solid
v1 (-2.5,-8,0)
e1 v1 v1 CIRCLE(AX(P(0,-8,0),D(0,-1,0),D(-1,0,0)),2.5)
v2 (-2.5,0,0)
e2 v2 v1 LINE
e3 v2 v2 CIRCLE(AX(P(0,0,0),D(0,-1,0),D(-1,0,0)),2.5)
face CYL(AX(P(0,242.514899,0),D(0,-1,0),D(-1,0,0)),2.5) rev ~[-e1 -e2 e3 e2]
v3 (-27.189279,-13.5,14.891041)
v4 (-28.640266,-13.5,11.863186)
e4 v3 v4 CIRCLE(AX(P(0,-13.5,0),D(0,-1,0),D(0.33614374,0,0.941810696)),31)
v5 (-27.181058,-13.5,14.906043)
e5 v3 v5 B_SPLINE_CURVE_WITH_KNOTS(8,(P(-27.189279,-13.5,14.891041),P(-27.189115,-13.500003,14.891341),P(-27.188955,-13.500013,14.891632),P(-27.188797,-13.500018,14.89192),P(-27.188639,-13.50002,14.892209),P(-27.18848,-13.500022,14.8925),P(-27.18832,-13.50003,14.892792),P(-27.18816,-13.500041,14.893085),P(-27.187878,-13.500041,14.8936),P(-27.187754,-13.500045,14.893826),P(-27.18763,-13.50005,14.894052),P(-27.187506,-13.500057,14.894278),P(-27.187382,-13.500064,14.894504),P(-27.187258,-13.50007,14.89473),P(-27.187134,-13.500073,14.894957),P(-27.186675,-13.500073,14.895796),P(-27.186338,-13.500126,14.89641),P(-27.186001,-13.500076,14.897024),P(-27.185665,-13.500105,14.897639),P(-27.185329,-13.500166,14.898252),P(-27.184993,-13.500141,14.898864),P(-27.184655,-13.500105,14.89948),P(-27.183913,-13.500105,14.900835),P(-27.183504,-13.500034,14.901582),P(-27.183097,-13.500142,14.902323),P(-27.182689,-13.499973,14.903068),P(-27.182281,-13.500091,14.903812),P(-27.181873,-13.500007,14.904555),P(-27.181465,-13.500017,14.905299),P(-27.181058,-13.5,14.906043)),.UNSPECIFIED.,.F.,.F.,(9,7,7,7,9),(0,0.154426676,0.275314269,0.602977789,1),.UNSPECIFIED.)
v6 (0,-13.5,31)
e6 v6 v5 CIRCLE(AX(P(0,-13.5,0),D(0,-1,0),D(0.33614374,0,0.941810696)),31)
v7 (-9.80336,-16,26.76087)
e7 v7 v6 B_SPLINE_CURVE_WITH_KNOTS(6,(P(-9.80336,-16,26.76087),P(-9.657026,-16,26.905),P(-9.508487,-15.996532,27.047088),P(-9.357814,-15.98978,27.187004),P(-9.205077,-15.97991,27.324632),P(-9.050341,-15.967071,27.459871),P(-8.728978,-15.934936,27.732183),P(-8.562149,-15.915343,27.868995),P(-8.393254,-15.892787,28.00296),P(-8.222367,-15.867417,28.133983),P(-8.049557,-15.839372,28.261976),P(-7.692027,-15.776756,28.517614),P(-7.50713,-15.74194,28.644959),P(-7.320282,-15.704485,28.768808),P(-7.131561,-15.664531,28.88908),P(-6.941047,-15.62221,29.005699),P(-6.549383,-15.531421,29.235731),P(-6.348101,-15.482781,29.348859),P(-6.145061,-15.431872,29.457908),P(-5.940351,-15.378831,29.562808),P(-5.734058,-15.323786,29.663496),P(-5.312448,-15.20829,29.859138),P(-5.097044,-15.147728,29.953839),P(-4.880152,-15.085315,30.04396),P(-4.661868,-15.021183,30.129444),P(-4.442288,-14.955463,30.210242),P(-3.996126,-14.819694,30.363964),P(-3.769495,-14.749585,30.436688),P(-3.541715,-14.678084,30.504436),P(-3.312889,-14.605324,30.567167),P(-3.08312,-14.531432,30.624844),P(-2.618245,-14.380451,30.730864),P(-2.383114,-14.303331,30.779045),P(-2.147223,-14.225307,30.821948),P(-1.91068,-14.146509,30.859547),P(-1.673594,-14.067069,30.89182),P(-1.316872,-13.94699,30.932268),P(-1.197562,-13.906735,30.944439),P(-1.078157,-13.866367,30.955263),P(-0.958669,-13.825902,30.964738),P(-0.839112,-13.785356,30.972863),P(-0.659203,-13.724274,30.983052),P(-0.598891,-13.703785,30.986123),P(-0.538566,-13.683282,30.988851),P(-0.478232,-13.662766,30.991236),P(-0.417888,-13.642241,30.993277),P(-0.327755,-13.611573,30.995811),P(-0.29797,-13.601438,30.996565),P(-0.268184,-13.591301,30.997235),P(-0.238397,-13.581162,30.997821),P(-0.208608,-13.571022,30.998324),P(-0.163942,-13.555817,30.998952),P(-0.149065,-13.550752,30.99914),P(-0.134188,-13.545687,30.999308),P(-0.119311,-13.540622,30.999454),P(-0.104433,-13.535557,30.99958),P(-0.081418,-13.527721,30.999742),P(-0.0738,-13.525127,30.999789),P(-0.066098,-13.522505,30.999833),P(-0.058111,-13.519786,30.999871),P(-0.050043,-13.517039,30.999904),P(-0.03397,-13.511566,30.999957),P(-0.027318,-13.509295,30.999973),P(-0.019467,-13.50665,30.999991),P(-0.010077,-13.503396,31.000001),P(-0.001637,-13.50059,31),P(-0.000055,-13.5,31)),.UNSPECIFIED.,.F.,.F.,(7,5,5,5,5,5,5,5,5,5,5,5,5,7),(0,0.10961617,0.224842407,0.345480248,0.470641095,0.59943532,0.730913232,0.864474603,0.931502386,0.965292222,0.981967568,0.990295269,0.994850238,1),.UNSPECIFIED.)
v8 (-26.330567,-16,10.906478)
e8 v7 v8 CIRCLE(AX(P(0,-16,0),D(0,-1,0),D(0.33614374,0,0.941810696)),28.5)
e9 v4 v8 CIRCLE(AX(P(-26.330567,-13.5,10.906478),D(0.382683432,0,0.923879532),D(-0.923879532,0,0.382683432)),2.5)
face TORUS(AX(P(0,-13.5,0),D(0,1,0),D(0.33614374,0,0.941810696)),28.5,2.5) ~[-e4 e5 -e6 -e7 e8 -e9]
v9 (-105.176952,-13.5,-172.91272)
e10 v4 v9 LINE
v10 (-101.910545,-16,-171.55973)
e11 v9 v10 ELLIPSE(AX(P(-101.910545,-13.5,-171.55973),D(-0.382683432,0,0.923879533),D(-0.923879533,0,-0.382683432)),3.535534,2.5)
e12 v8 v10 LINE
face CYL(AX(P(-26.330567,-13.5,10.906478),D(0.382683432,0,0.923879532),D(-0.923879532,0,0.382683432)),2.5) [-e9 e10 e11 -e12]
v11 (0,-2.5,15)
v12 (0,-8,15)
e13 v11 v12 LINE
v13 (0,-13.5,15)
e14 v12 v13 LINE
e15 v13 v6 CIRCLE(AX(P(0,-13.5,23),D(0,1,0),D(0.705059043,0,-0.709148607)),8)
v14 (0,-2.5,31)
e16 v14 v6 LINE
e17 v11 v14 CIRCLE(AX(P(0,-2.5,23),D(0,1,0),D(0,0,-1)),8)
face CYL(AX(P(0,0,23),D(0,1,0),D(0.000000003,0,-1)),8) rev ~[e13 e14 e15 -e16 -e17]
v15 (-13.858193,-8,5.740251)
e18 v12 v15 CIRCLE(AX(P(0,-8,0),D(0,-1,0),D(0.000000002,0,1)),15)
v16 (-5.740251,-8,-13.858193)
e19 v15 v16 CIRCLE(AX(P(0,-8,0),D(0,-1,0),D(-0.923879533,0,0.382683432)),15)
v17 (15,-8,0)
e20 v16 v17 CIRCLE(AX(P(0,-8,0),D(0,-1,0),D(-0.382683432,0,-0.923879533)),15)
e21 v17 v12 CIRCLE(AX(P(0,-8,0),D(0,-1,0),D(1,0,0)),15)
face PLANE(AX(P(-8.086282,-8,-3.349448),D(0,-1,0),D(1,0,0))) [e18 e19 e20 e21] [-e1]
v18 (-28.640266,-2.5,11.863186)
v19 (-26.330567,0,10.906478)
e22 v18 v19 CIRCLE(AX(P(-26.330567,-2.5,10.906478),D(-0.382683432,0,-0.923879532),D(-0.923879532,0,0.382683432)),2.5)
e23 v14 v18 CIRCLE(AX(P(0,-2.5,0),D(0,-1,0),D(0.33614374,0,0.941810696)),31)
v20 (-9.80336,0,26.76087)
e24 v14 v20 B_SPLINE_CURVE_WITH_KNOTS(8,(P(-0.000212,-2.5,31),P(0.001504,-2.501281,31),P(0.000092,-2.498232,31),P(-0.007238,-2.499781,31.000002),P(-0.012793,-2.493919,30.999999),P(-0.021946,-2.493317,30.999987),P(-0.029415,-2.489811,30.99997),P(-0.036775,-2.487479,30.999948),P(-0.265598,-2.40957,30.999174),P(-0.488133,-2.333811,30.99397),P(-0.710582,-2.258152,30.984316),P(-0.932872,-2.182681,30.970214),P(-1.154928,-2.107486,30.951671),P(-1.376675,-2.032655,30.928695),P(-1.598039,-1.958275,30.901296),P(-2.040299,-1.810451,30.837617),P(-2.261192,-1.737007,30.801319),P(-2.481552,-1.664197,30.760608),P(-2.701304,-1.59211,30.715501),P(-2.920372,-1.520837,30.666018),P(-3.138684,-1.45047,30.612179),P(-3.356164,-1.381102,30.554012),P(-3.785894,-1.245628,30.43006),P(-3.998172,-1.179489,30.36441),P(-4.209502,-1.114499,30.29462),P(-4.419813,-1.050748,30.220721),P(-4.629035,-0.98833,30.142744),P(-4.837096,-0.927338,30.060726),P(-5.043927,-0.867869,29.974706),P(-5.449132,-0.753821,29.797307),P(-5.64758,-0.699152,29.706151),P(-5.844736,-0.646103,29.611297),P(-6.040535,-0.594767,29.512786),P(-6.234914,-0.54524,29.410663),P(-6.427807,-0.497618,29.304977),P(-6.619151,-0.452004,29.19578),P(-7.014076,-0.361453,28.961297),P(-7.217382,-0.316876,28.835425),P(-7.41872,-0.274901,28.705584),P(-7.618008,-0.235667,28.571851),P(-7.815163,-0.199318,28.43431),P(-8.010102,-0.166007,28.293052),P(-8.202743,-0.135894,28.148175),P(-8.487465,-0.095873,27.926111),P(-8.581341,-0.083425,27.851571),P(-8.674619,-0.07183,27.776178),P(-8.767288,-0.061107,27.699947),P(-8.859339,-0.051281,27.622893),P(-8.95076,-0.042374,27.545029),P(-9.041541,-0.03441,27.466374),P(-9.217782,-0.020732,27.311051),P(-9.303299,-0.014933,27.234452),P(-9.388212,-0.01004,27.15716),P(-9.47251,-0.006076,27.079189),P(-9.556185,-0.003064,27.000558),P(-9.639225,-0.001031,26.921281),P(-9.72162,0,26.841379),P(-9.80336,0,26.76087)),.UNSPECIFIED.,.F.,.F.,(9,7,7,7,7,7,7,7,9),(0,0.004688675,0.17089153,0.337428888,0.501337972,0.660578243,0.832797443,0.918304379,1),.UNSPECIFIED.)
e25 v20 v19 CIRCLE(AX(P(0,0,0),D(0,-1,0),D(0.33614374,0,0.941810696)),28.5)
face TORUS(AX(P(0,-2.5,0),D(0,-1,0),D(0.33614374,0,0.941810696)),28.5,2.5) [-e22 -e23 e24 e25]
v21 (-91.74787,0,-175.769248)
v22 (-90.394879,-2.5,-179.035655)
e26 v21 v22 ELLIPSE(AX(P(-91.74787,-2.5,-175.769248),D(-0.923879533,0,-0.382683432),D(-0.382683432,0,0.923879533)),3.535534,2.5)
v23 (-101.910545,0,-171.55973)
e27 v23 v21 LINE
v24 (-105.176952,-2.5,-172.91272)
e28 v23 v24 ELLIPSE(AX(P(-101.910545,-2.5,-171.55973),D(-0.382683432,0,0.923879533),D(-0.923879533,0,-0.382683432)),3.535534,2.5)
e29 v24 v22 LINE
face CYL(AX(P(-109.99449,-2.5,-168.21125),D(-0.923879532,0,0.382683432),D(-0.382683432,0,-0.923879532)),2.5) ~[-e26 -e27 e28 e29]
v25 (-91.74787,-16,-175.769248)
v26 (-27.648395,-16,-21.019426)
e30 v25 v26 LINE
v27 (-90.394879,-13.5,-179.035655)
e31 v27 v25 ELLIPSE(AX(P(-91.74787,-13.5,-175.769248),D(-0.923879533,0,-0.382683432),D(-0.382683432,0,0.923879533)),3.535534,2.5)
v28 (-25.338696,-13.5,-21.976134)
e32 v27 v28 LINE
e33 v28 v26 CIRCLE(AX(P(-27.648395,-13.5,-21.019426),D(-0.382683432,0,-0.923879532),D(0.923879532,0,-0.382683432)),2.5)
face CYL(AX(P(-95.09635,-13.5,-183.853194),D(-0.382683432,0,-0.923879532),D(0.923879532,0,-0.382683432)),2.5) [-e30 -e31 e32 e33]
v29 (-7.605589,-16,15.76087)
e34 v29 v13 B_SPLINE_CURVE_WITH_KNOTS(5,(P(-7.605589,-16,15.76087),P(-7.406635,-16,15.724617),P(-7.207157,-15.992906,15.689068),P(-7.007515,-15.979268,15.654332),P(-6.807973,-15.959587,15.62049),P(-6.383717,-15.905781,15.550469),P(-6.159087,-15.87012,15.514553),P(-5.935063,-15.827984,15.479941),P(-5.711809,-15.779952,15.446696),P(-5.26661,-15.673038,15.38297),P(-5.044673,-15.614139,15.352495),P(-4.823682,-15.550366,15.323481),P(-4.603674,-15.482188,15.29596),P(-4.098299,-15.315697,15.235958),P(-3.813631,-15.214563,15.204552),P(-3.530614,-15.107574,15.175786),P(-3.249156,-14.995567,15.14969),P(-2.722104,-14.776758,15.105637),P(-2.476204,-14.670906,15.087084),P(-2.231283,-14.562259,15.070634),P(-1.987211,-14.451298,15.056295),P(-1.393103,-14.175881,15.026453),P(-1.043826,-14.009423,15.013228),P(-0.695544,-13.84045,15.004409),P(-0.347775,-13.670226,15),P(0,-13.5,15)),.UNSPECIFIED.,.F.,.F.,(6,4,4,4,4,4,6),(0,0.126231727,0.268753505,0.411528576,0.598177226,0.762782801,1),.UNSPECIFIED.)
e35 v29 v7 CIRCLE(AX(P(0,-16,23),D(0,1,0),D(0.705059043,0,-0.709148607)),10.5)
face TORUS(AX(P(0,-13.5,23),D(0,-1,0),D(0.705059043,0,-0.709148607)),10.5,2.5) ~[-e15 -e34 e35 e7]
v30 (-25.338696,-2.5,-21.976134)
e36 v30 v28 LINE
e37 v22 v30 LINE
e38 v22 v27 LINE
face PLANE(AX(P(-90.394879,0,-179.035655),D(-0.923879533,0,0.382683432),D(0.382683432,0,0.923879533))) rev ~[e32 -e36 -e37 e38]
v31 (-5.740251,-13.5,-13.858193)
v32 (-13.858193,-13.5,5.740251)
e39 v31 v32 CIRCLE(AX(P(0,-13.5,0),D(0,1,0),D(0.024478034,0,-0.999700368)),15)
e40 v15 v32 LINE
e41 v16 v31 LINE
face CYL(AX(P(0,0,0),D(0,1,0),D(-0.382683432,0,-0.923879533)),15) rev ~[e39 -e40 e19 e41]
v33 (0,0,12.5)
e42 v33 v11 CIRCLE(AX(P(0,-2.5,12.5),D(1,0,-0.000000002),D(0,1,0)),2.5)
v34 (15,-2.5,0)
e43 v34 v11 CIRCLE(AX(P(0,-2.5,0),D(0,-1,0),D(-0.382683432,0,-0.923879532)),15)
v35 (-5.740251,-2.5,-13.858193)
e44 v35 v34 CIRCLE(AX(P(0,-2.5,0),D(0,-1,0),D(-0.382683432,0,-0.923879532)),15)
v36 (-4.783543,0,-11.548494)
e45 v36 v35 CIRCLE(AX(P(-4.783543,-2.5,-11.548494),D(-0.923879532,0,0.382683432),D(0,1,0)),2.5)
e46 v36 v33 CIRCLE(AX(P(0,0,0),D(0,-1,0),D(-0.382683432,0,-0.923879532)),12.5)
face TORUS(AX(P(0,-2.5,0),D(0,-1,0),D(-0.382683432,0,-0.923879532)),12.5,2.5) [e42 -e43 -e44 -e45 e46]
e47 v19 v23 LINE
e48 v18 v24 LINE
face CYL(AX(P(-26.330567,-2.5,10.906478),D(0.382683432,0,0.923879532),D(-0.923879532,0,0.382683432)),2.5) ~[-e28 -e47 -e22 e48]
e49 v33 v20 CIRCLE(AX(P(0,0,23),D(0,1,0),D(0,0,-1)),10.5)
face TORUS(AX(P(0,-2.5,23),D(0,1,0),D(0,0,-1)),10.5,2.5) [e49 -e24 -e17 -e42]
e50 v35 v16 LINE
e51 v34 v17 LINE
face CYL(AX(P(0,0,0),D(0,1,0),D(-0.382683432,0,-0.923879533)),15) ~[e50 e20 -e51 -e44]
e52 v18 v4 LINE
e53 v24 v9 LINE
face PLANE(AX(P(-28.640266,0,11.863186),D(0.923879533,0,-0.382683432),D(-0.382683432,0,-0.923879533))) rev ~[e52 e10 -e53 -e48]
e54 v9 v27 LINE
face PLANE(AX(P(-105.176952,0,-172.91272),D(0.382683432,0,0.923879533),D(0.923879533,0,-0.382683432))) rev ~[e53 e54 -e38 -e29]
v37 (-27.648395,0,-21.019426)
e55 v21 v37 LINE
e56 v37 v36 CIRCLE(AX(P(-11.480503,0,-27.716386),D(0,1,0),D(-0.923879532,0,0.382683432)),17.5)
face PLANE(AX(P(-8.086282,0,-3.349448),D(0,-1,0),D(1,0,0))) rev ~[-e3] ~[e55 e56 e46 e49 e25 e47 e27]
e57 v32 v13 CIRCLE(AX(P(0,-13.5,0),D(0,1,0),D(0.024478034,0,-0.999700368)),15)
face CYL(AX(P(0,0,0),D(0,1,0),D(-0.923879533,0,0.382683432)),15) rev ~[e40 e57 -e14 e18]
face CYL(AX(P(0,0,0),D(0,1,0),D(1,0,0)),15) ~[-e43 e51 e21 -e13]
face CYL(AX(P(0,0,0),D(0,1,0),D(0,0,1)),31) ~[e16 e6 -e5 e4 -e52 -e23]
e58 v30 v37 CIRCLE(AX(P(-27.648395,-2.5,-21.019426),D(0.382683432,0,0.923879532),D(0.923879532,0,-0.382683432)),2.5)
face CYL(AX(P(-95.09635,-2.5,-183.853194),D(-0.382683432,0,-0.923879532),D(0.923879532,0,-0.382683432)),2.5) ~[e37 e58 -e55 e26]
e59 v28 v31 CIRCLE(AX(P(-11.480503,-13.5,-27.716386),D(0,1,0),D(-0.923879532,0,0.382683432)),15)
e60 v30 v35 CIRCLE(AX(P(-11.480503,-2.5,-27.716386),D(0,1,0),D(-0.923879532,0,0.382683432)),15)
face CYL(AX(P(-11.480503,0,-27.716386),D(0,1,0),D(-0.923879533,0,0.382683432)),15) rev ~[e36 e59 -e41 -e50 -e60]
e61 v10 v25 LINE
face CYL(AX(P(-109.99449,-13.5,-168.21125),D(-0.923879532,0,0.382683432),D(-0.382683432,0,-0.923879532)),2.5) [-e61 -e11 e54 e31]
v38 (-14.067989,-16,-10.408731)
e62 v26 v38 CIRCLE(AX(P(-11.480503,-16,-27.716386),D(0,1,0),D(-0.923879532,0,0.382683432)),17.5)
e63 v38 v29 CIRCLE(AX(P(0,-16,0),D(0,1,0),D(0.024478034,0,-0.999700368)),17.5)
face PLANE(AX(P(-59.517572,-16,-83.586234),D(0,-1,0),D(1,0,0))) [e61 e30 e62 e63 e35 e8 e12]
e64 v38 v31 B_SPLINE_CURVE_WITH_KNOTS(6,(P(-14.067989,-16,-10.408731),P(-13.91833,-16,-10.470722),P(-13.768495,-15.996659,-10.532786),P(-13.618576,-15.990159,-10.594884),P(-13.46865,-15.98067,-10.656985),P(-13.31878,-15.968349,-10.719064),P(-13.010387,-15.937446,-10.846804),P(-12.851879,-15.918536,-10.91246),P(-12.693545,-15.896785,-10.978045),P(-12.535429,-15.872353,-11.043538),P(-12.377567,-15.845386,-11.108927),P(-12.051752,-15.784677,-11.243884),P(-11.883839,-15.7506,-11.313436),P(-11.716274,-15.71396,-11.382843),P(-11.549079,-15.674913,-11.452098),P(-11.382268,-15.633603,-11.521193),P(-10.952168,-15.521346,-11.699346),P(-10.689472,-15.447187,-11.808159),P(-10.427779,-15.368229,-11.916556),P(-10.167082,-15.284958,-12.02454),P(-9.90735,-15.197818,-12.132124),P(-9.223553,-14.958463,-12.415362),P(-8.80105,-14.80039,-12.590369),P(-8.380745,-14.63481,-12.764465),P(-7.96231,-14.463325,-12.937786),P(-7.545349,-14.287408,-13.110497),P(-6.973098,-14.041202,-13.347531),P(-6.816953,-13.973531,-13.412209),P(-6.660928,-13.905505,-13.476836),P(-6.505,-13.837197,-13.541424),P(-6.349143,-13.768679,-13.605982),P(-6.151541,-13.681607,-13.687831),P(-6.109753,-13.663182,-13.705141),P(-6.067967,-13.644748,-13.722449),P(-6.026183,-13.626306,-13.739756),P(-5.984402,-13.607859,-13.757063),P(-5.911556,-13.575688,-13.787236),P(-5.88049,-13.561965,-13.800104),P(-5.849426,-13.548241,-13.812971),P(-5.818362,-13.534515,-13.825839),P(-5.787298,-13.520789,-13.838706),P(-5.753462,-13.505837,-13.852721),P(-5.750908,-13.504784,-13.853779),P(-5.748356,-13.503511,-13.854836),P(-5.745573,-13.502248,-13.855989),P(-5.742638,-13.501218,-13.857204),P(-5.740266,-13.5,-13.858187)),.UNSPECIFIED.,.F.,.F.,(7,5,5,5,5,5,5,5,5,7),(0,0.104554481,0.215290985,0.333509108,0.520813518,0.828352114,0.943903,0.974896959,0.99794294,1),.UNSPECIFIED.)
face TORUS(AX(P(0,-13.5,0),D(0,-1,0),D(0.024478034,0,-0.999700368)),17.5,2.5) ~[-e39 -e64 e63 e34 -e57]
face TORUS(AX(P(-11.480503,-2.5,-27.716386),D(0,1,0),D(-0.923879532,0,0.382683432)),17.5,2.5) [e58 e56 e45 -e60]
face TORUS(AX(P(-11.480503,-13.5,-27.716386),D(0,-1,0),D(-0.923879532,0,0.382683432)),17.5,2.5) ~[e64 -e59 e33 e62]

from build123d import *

# Parameters (mm, degrees)
F1_DEPTH     = 16
F2_DEPTH     = 8
F3_T1_DEPTH  = 28.5
F3_T3_DEPTH  = 176.25
F3_T5_DEPTH  = 206.25
F3_T8_ANGLE  = 113.8828315396
F3_T10_ANGLE = 205.3052563157
F3_T12_ANGLE = 301.0526480562
F3_T14_ANGLE = 87.1421031631
F3_T16_ANGLE = 90
F3_T18_ANGLE = 202.4999999088
F3_T20_ANGLE = 256.2183340246
F3_T22_ANGLE = 87.1421031631
F4_D         = 5


# Not quite as in the source:
# - a fillet or chamfer that OpenCascade refuses, or shapes differently, is made with other operations: its cross-section is extruded or revolved along the edge and cut away or added


with BuildPart() as f1:
    # F0 (on Front) → F1 (new body)
    with BuildSketch(Plane.XZ):
        Polygon((-25.3386959586, -21.9761344899), (-13.8581929877, 5.7402514855), (-28.6402655078, 11.8631864033), (-105.1769519809, -172.9127200989), (-90.3948794607, -179.0356550168), align=None)
        with BuildLine():
            Line((-28.6402655078, 11.8631864033), (-13.8581929877, 5.7402514855))
            ThreePointArc((-13.8581929877, 5.7402514855), (-8.3335534854, 12.4720441912), (2.39e-08, 15))
            ThreePointArc((2.39e-08, 15), (-8, 22.9999999881), (0, 31))
            ThreePointArc((0, 31), (-17.2226772236, 25.7755579814), (-28.6402655078, 11.8631864033))
        make_face()
        with BuildLine():
            ThreePointArc((-5.7402514855, -13.8581929877), (-13.8581929877, -5.7402514855), (-13.8581929877, 5.7402514855))
            Line((-13.8581929877, 5.7402514855), (-25.3386959586, -21.9761344899))
            ThreePointArc((-25.3386959586, -21.9761344899), (-17.2207544564, -13.8581929877), (-5.7402514855, -13.8581929877))
        make_face()
    extrude(amount=F1_DEPTH)

    # F0 (on Front) → F2 (join)
    with BuildSketch(Plane.XZ):
        with BuildLine():
            Line((0, 0), (-13.8581929877, 5.7402514855))
            ThreePointArc((-13.8581929877, 5.7402514855), (-13.8581929877, -5.7402514855), (-5.7402514855, -13.8581929877))
            Line((-5.7402514855, -13.8581929877), (0, 0))
        make_face()
        with BuildLine():
            ThreePointArc((2.39e-08, 15), (-8.3335534854, 12.4720441912), (-13.8581929877, 5.7402514855))
            Line((-13.8581929877, 5.7402514855), (0, 0))
            Line((0, 0), (-5.7402514855, -13.8581929877))
            ThreePointArc((-5.7402514855, -13.8581929877), (8.3335534953, -12.4720441845), (15, 0))
            ThreePointArc((15, 0), (10.6066017262, 10.6066017094), (2.39e-08, 15))
        make_face()
    extrude(amount=F2_DEPTH)

    # F3: fillet of radius 2.5 on 14 edges, made by hand

    # F3_s2 → F3_t1 (cut)
    with BuildSketch(Plane(origin=(-34.414512586, 0, 14.2549578556), x_dir=(0, 1, 0), z_dir=(0.9238795325, 0, -0.3826834324))):
        with BuildLine():
            ThreePointArc((-13.5, -200), (-15.267766953, -199.267766953), (-16, -197.5))
            Line((-16, -197.5), (-16, -200))
            Line((-16, -200), (-13.5, -200))
        make_face()
        with BuildLine():
            ThreePointArc((-2.5, -200), (-0.732233047, -199.267766953), (0, -197.5))
            Line((0, -197.5), (0, -200))
            Line((0, -200), (-2.5, -200))
        make_face()
    extrude(amount=F3_T1_DEPTH, mode=Mode.SUBTRACT)

    # F3_s4 → F3_t3 (cut)
    with BuildSketch(Plane(origin=(-78.9284579253, 0, -190.5501535805), x_dir=(0, 1, 0), z_dir=(0.3826834324, 0, 0.9238795325))):
        with BuildLine():
            ThreePointArc((-13.5, 15), (-15.267766953, 15.732233047), (-16, 17.5))
            Line((-16, 17.5), (-16, 15))
            Line((-16, 15), (-13.5, 15))
        make_face()
        with BuildLine():
            ThreePointArc((-2.5, 15), (-0.732233047, 15.732233047), (0, 17.5))
            Line((0, 17.5), (0, 15))
            Line((0, 15), (-2.5, 15))
        make_face()
    extrude(amount=F3_T3_DEPTH, mode=Mode.SUBTRACT)

    # F3_s6 → F3_t5 (cut)
    with BuildSketch(Plane(origin=(0, 0, 0), x_dir=(0, 1, 0), z_dir=(-0.3826834324, 0, -0.9238795325))):
        with BuildLine():
            ThreePointArc((-13.5, -31), (-15.267766953, -30.267766953), (-16, -28.5))
            Line((-16, -28.5), (-16, -31))
            Line((-16, -31), (-13.5, -31))
        make_face()
        with BuildLine():
            ThreePointArc((-2.5, -31), (-0.732233047, -30.267766953), (0, -28.5))
            Line((0, -28.5), (0, -31))
            Line((0, -31), (-2.5, -31))
        make_face()
    extrude(amount=F3_T5_DEPTH, mode=Mode.SUBTRACT)

    # F3_s7 → F3_t8 (revolve, cut)
    with BuildSketch(Plane(origin=(-11.480502971, 0, -27.7163859753), x_dir=(0, 1, 0), z_dir=(-0.3826834324, 0, -0.9238795325))):
        with BuildLine():
            ThreePointArc((-16, -17.5), (-15.267766953, -15.732233047), (-13.5, -15))
            Line((-13.5, -15), (-16, -15))
            Line((-16, -15), (-16, -17.5))
        make_face()
    revolve(axis=Axis((-11.480502971, -16, -27.7163859753), (0, 1, 0)), revolution_arc=F3_T8_ANGLE, mode=Mode.SUBTRACT)

    # F3_s9 → F3_t10 (revolve, cut)
    with BuildSketch(Plane(origin=(0, 0, 0), x_dir=(0, 1, 0), z_dir=(0.999700368, 0, 0.0244780336))):
        with BuildLine():
            ThreePointArc((-16, -17.5), (-15.267766953, -15.732233047), (-13.5, -15))
            Line((-13.5, -15), (-16, -15))
            Line((-16, -15), (-16, -17.5))
        make_face()
    revolve(axis=Axis((0, -16, 0), (0, 1, 0)), revolution_arc=F3_T10_ANGLE, mode=Mode.SUBTRACT)

    # F3_s11 → F3_t12 (revolve, cut)
    with BuildSketch(Plane(origin=(11.4998076678, 0, 11.4334898289), x_dir=(0, 1, 0), z_dir=(0.7091486068, 0, 0.7050590425))):
        with BuildLine():
            ThreePointArc((-16, 5.8104179571), (-15.267766953, 7.5781849101), (-13.5, 8.3104179571))
            Line((-13.5, 8.3104179571), (-16, 8.3104179571))
            Line((-16, 8.3104179571), (-16, 5.8104179571))
        make_face()
    revolve(axis=Axis((0, -16, 23), (0, 1, 0)), revolution_arc=F3_T12_ANGLE, mode=Mode.SUBTRACT)

    # F3_s13 → F3_t14 (revolve, cut)
    with BuildSketch(Plane(origin=(0, 0, 0), x_dir=(0, 1, 0), z_dir=(0.9418106956, 0, -0.3361437395))):
        with BuildLine():
            ThreePointArc((-16, 28.5), (-15.267766953, 30.267766953), (-13.5, 31))
            Line((-13.5, 31), (-16, 31))
            Line((-16, 31), (-16, 28.5))
        make_face()
    revolve(axis=Axis((0, -16, 0), (0, -1, 0)), revolution_arc=F3_T14_ANGLE, mode=Mode.SUBTRACT)

    # F3_s15 → F3_t16 (revolve, cut)
    with BuildSketch(Plane(origin=(-11.480502971, 0, -27.7163859753), x_dir=(0, 1, 0), z_dir=(-0.3826834324, 0, -0.9238795325))):
        with BuildLine():
            ThreePointArc((0, -17.5), (-0.732233047, -15.732233047), (-2.5, -15))
            Line((-2.5, -15), (0, -15))
            Line((0, -15), (0, -17.5))
        make_face()
    revolve(axis=Axis((-11.480502971, 0, -27.7163859753), (0, 1, 0)), revolution_arc=F3_T16_ANGLE, mode=Mode.SUBTRACT)

    # F3_s17 → F3_t18 (revolve, cut)
    with BuildSketch(Plane(origin=(0, 0, 0), x_dir=(0, 1, 0), z_dir=(-0.9238795325, 0, 0.3826834324))):
        with BuildLine():
            ThreePointArc((0, 12.5), (-0.732233047, 14.267766953), (-2.5, 15))
            Line((-2.5, 15), (0, 15))
            Line((0, 15), (0, 12.5))
        make_face()
    revolve(axis=Axis((0, 0, 0), (0, -1, 0)), revolution_arc=F3_T18_ANGLE, mode=Mode.SUBTRACT)

    # F3_s19 → F3_t20 (revolve, cut)
    with BuildSketch(Plane.YZ):
        with BuildLine():
            ThreePointArc((0, 12.5), (-0.732233047, 14.267766953), (-2.5, 15))
            Line((-2.5, 15), (0, 15))
            Line((0, 15), (0, 12.5))
        make_face()
    revolve(axis=Axis((0, 0, 23), (0, 1, 0)), revolution_arc=F3_T20_ANGLE, mode=Mode.SUBTRACT)

    # F3_s21 → F3_t22 (revolve, cut)
    with BuildSketch(Plane(origin=(0, 0, 0), x_dir=(0, 1, 0), z_dir=(0.9418106956, 0, -0.3361437395))):
        with BuildLine():
            ThreePointArc((0, 28.5), (-0.732233047, 30.267766953), (-2.5, 31))
            Line((-2.5, 31), (0, 31))
            Line((0, 31), (0, 28.5))
        make_face()
    revolve(axis=Axis((0, 0, 0), (0, -1, 0)), revolution_arc=F3_T22_ANGLE, mode=Mode.SUBTRACT)

    # F4 (through all)
    with Locations(Plane(origin=(0, 0, 0), x_dir=(1, 0, 0), z_dir=(0, 1, 0))):
        with Locations((0, 0)):
            Hole(F4_D / 2)


solid = f1.part
